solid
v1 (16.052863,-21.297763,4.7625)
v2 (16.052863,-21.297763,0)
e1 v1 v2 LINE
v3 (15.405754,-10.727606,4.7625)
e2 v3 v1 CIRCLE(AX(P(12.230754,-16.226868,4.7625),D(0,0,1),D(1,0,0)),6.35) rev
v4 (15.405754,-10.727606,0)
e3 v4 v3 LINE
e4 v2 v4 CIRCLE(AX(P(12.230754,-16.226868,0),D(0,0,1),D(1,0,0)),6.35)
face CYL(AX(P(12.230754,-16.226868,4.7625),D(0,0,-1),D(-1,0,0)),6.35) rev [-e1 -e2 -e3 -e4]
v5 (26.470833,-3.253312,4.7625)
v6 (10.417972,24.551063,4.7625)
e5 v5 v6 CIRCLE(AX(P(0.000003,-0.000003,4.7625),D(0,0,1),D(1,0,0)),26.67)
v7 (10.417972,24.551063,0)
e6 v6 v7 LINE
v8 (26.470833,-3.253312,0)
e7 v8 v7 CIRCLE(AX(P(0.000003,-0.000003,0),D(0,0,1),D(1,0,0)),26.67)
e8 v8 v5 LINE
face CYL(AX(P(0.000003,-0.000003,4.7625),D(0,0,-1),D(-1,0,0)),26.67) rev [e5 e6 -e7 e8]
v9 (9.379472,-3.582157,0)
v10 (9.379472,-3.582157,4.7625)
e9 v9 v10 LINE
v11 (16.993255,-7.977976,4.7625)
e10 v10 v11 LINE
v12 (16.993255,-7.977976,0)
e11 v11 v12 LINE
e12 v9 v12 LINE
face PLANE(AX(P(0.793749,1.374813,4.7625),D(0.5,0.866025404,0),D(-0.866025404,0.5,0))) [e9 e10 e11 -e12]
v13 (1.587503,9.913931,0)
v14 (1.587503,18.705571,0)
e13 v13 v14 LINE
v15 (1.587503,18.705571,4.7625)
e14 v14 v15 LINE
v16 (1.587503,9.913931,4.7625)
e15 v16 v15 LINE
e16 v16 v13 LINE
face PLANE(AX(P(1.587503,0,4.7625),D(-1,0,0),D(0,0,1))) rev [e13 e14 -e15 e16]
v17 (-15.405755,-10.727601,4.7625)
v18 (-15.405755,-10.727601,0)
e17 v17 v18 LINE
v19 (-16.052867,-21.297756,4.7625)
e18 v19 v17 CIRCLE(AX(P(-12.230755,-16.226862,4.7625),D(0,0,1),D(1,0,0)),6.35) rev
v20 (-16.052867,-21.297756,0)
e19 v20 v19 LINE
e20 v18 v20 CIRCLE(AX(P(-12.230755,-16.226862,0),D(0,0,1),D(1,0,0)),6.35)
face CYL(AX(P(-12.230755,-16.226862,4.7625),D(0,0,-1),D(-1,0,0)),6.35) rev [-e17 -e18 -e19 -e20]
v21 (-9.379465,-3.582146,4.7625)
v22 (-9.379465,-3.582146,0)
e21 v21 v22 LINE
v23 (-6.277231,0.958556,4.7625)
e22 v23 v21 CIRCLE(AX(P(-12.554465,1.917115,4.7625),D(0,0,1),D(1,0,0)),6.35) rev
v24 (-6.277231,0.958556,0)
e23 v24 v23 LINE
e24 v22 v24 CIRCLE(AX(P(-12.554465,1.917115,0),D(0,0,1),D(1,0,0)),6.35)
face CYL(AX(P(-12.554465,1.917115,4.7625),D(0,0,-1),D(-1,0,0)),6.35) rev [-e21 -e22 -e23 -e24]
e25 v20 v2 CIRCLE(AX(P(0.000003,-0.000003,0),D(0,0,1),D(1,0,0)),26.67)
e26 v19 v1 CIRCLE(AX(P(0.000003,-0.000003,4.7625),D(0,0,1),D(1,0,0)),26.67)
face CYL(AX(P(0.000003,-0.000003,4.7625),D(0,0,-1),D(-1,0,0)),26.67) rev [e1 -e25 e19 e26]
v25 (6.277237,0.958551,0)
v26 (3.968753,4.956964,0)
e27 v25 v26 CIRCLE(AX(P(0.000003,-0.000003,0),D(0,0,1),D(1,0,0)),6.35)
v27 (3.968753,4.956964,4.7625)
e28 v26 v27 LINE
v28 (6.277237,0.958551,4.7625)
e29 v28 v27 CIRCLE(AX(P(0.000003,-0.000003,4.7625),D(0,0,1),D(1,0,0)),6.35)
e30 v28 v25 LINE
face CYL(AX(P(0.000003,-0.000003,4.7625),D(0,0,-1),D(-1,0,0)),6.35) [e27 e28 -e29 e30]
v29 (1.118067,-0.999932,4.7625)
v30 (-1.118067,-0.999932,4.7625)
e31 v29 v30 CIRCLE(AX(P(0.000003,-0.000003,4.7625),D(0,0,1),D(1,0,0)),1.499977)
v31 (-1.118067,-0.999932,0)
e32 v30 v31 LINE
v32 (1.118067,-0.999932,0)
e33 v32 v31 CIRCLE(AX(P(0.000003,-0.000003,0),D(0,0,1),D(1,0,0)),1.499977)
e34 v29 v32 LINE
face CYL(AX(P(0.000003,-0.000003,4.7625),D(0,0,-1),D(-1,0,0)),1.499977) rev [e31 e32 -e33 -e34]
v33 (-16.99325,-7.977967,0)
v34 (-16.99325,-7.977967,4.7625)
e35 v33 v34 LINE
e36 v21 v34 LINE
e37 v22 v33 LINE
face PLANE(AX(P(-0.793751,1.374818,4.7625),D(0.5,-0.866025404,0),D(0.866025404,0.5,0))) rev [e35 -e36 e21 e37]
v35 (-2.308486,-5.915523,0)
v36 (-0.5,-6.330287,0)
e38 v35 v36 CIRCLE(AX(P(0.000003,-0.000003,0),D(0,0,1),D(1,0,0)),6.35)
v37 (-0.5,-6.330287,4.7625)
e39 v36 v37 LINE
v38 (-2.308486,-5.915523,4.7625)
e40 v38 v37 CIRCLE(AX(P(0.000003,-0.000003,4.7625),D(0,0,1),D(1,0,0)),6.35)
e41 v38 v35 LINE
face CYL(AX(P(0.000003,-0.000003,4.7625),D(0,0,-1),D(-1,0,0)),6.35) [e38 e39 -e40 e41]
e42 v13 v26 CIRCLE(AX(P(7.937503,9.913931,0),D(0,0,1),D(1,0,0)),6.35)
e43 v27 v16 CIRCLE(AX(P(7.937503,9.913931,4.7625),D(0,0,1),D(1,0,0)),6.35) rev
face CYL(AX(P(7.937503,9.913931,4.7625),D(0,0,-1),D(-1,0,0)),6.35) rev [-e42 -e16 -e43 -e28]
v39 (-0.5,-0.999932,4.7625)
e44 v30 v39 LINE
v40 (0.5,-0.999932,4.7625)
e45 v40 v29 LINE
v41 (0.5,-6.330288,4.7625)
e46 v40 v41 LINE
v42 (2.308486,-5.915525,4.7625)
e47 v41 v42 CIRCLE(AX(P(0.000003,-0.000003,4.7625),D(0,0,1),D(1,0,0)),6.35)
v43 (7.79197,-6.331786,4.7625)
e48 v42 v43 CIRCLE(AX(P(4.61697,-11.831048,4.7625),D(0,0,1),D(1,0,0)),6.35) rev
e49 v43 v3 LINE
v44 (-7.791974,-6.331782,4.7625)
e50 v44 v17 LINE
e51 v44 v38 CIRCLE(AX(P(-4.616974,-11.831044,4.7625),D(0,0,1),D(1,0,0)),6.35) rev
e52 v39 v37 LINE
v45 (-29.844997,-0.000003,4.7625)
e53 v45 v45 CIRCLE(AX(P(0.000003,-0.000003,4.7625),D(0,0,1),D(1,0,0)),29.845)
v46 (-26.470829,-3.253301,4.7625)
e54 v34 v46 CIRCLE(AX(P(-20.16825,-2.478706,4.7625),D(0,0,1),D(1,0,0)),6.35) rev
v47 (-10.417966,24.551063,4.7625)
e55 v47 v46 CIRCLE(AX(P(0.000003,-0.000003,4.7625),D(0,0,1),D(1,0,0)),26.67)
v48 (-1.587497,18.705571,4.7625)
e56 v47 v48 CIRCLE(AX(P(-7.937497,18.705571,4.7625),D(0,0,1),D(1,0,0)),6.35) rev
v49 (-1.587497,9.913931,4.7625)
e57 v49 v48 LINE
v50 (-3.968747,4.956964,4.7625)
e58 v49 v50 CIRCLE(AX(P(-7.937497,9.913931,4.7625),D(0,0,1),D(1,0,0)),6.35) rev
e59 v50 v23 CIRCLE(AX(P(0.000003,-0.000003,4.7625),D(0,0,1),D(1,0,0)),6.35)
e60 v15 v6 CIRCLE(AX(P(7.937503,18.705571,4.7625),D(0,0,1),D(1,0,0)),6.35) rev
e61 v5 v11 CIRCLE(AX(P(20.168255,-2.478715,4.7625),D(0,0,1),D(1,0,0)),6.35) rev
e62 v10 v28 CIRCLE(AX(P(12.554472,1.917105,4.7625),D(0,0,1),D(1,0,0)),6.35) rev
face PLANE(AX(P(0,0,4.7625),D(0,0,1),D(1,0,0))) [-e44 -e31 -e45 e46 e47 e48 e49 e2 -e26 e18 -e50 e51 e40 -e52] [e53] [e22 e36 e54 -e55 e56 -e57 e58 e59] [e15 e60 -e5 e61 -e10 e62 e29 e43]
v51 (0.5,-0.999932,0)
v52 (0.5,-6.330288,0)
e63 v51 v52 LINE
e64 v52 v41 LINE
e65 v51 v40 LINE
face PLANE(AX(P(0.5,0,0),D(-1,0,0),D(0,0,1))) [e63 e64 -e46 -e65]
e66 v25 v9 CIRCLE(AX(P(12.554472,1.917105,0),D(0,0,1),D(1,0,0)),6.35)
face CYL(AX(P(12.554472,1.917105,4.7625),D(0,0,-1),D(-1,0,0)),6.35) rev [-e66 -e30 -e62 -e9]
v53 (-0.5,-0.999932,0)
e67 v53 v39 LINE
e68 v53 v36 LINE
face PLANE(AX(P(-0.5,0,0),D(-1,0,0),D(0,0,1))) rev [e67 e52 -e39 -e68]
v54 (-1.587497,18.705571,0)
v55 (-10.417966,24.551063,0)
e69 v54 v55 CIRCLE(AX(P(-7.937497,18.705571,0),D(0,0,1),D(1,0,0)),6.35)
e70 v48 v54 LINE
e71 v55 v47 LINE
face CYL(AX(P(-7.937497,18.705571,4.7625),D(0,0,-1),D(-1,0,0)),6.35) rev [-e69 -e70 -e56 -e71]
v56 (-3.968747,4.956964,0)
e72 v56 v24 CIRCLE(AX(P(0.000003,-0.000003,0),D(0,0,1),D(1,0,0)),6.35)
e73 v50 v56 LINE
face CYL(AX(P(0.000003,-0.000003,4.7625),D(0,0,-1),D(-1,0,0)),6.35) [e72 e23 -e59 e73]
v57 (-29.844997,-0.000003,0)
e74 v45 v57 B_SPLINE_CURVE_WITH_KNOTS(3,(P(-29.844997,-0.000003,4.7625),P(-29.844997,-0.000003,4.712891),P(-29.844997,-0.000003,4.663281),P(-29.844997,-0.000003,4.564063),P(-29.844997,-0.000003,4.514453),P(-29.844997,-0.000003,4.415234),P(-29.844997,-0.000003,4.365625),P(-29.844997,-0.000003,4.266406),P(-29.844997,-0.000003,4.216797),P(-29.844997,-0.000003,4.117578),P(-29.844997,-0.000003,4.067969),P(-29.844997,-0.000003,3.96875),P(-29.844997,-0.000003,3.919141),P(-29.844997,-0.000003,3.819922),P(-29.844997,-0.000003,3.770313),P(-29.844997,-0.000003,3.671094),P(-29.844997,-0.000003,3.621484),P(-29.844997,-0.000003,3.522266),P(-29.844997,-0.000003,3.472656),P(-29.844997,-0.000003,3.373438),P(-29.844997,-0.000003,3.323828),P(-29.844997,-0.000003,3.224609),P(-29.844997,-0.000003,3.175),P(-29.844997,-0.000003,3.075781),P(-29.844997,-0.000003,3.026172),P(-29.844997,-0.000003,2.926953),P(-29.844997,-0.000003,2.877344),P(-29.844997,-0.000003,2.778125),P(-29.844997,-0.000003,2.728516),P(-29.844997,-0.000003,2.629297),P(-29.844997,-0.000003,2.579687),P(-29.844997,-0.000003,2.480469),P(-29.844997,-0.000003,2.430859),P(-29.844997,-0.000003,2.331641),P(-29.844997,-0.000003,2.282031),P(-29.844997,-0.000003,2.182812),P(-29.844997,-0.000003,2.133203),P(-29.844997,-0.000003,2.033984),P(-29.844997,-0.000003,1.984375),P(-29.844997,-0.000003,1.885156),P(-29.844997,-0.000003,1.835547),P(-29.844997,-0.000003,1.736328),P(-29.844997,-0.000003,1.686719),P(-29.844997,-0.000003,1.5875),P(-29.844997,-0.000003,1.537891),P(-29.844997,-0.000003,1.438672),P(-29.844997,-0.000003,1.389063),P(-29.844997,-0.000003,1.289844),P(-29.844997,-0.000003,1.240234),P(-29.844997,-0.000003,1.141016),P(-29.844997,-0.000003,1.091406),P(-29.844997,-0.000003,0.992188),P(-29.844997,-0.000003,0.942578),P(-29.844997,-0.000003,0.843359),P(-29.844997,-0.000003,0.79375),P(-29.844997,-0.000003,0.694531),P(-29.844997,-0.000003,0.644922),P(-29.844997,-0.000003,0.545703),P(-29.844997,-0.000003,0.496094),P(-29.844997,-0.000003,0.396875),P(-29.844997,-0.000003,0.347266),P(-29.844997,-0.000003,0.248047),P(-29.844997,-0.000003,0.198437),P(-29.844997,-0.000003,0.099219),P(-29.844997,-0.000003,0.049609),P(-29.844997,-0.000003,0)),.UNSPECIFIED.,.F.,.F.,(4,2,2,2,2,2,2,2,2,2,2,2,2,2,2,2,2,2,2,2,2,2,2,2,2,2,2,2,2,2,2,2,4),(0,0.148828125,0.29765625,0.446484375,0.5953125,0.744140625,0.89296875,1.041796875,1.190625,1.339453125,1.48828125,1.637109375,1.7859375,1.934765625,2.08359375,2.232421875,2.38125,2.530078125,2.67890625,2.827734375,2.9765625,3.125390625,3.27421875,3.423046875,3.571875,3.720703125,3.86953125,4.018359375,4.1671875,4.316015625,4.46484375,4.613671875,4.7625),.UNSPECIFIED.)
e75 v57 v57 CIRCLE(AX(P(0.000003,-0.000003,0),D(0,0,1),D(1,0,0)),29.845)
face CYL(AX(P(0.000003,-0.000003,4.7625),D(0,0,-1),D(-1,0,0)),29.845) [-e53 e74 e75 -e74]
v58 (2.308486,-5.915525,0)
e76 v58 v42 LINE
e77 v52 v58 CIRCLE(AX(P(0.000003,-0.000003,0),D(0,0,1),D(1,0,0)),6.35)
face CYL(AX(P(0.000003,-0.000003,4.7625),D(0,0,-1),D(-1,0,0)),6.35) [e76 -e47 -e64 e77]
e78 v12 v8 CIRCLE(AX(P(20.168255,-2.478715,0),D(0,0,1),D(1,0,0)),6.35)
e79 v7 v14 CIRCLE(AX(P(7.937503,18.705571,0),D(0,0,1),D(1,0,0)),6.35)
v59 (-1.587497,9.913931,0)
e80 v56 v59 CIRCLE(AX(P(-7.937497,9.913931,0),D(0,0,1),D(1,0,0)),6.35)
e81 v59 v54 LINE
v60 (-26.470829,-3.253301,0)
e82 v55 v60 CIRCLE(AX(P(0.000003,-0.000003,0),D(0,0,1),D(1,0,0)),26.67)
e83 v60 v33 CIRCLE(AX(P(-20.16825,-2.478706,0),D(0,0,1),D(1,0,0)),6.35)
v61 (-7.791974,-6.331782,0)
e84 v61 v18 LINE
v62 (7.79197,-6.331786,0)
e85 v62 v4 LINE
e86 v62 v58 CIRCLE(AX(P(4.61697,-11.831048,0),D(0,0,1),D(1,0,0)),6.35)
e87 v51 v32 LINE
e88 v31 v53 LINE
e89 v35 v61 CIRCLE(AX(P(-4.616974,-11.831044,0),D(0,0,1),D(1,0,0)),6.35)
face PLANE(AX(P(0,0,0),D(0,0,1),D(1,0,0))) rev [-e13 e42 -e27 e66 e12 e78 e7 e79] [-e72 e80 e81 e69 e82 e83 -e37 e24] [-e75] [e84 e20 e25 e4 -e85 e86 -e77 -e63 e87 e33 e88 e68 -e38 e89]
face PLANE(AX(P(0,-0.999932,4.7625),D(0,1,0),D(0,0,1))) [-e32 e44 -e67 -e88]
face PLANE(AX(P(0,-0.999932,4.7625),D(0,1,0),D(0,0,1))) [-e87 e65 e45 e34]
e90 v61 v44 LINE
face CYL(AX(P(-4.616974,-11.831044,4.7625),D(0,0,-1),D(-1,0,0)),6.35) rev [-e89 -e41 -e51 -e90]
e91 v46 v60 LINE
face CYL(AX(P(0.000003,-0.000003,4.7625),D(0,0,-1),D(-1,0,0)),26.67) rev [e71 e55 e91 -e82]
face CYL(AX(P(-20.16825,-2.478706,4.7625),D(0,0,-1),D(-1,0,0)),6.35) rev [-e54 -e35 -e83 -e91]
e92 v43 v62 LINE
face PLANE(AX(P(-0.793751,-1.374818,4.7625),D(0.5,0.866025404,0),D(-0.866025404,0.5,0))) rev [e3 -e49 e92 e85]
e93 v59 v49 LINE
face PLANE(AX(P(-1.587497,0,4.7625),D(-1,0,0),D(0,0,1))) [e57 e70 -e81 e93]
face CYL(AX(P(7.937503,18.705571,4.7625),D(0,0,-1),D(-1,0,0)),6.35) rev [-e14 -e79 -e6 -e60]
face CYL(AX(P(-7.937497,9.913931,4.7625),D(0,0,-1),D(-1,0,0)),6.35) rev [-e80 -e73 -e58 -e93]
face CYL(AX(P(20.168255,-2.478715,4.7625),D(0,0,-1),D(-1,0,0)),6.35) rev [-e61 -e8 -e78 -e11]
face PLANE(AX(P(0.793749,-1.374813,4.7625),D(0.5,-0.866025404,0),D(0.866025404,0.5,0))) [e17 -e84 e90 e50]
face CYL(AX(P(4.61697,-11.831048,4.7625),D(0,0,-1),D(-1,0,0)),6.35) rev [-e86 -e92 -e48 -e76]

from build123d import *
from OCP.BRepAlgoAPI import BRepAlgoAPI_Cut
from OCP.TopTools import TopTools_ListOfShape

# Parameters (mm, degrees)
BOSS_EXTRUDE1_OUTLINE_R = 29.845
BOSS_EXTRUDE1_DEPTH     = 4.7625
FILLET1_R               = 6.35
CUT_EXTRUDE1_DEPTH      = 43.475049227


with BuildPart() as part:
    # Boss-Extrude1: read off the stored shape, not the designer's step
    # Boss-Extrude1 outline → Boss-Extrude1 (new body)
    with BuildSketch(Plane.XY):
        with Locations((2.773e-06, -3.1e-06)):
            Circle(BOSS_EXTRUDE1_OUTLINE_R)
        with BuildLine():
            Line((4.530888578, -4.449000046), (22.26219582, -14.686175534))
            ThreePointArc((22.26219582, -14.686175534), (-1.522e-06, -26.6700031), (-22.262195004, -14.686168364))
            Line((-22.262195004, -14.686168364), (-4.530889051, -4.448993916))
            ThreePointArc((-4.530889051, -4.448993916), (-1.522e-06, -6.3500031), (4.530888578, -4.449000046))
        make_face(mode=Mode.SUBTRACT)
        with BuildLine():
            Line((-6.11838599, -1.699361492), (-23.849694433, -11.936537069))
            ThreePointArc((-23.849694433, -11.936537069), (-23.096893005, 13.334999916), (-1.587497227, 26.622707951))
            Line((-1.587497227, 26.622707951), (-1.587497227, 6.148357962))
            ThreePointArc((-1.587497227, 6.148357962), (-5.499256774, 3.174999961), (-6.11838599, -1.699361492))
        make_face(mode=Mode.SUBTRACT)
        with BuildLine():
            Line((1.118068907, -0.999933056), (-1.118065826, -0.9999303))
            ThreePointArc((-1.118065826, -0.9999303), (4.622e-06, 1.499974165), (1.118068907, -0.999933056))
        make_face(mode=Mode.SUBTRACT)
        with BuildLine():
            Line((1.587502773, 6.148357962), (1.587502773, 26.622707951))
            ThreePointArc((1.587502773, 26.622707951), (23.096900555, 13.334996444), (23.849696391, -11.936544238))
            Line((23.849696391, -11.936544238), (6.118389237, -1.69936977))
            ThreePointArc((6.118389237, -1.69936977), (5.499264467, 3.17499624), (1.587502773, 6.148357962))
        make_face(mode=Mode.SUBTRACT)
    extrude(amount=BOSS_EXTRUDE1_DEPTH)

    # Fillet1
    fillet1_edges = [part.edges().sort_by_distance(p)[0] for p in [
        (4.530888578, -4.449000046, 2.38125),
        (-4.530889051, -4.448993916, 2.38125),
        (-22.262195004, -14.686168364, 2.38125),
        (22.26219582, -14.686175534, 2.38125),
        (-23.849694433, -11.936537069, 2.38125),
        (-6.11838599, -1.699361492, 2.38125),
        (-1.587497227, 6.148357962, 2.38125),
        (-1.587497227, 26.622707951, 2.38125),
        (1.587502773, 26.622707951, 2.38125),
        (1.587502773, 6.148357962, 2.38125),
        (6.118389237, -1.69936977, 2.38125),
        (23.849696391, -11.936544238, 2.38125),
    ]]
    fillet(fillet1_edges, radius=FILLET1_R)


with BuildPart() as cut_extrude1_tool:
    # Sketch2 → Cut-Extrude1 (new, through all)
    with BuildSketch(Plane.XY.offset(4.7625)):
        with BuildLine():
            Line((0.500000016, -0.999931678), (0, -0.999931678))
            Line((0, -0.999931678), (0, -6.3500031))
            ThreePointArc((0, -6.3500031), (0.250194284, -6.345072384), (0.500000016, -6.330287672))
            Line((0.500000016, -6.330287672), (0.500000016, -0.999931678))
        make_face()
        with BuildLine():
            Line((0, -6.3500031), (0, -0.999931678))
            Line((0, -0.999931678), (-0.500000016, -0.999931678))
            Line((-0.500000016, -0.999931678), (-0.500000016, -6.330287234))
            ThreePointArc((-0.500000016, -6.330287234), (-0.250194288, -6.345072165), (0, -6.3500031))
        make_face()
    extrude(amount=-CUT_EXTRUDE1_DEPTH)


with BuildPart() as part_1:
    add(part.part)

    # Cut-Extrude1: cut by cut_extrude1_tool, with a tolerance
    cut_extrude1_stock = TopTools_ListOfShape()
    cut_extrude1_stock.Append(part_1.part.wrapped)
    cut_extrude1_tools = TopTools_ListOfShape()
    cut_extrude1_tools.Append(cut_extrude1_tool.part.wrapped)
    cut_extrude1_cut = BRepAlgoAPI_Cut()
    cut_extrude1_cut.SetArguments(cut_extrude1_stock)
    cut_extrude1_cut.SetTools(cut_extrude1_tools)
    cut_extrude1_cut.SetFuzzyValue(0.00001)
    cut_extrude1_cut.Build()
    add(Compound.cast(cut_extrude1_cut.Shape()).solids(), mode=Mode.REPLACE)


solid = part_1.part
